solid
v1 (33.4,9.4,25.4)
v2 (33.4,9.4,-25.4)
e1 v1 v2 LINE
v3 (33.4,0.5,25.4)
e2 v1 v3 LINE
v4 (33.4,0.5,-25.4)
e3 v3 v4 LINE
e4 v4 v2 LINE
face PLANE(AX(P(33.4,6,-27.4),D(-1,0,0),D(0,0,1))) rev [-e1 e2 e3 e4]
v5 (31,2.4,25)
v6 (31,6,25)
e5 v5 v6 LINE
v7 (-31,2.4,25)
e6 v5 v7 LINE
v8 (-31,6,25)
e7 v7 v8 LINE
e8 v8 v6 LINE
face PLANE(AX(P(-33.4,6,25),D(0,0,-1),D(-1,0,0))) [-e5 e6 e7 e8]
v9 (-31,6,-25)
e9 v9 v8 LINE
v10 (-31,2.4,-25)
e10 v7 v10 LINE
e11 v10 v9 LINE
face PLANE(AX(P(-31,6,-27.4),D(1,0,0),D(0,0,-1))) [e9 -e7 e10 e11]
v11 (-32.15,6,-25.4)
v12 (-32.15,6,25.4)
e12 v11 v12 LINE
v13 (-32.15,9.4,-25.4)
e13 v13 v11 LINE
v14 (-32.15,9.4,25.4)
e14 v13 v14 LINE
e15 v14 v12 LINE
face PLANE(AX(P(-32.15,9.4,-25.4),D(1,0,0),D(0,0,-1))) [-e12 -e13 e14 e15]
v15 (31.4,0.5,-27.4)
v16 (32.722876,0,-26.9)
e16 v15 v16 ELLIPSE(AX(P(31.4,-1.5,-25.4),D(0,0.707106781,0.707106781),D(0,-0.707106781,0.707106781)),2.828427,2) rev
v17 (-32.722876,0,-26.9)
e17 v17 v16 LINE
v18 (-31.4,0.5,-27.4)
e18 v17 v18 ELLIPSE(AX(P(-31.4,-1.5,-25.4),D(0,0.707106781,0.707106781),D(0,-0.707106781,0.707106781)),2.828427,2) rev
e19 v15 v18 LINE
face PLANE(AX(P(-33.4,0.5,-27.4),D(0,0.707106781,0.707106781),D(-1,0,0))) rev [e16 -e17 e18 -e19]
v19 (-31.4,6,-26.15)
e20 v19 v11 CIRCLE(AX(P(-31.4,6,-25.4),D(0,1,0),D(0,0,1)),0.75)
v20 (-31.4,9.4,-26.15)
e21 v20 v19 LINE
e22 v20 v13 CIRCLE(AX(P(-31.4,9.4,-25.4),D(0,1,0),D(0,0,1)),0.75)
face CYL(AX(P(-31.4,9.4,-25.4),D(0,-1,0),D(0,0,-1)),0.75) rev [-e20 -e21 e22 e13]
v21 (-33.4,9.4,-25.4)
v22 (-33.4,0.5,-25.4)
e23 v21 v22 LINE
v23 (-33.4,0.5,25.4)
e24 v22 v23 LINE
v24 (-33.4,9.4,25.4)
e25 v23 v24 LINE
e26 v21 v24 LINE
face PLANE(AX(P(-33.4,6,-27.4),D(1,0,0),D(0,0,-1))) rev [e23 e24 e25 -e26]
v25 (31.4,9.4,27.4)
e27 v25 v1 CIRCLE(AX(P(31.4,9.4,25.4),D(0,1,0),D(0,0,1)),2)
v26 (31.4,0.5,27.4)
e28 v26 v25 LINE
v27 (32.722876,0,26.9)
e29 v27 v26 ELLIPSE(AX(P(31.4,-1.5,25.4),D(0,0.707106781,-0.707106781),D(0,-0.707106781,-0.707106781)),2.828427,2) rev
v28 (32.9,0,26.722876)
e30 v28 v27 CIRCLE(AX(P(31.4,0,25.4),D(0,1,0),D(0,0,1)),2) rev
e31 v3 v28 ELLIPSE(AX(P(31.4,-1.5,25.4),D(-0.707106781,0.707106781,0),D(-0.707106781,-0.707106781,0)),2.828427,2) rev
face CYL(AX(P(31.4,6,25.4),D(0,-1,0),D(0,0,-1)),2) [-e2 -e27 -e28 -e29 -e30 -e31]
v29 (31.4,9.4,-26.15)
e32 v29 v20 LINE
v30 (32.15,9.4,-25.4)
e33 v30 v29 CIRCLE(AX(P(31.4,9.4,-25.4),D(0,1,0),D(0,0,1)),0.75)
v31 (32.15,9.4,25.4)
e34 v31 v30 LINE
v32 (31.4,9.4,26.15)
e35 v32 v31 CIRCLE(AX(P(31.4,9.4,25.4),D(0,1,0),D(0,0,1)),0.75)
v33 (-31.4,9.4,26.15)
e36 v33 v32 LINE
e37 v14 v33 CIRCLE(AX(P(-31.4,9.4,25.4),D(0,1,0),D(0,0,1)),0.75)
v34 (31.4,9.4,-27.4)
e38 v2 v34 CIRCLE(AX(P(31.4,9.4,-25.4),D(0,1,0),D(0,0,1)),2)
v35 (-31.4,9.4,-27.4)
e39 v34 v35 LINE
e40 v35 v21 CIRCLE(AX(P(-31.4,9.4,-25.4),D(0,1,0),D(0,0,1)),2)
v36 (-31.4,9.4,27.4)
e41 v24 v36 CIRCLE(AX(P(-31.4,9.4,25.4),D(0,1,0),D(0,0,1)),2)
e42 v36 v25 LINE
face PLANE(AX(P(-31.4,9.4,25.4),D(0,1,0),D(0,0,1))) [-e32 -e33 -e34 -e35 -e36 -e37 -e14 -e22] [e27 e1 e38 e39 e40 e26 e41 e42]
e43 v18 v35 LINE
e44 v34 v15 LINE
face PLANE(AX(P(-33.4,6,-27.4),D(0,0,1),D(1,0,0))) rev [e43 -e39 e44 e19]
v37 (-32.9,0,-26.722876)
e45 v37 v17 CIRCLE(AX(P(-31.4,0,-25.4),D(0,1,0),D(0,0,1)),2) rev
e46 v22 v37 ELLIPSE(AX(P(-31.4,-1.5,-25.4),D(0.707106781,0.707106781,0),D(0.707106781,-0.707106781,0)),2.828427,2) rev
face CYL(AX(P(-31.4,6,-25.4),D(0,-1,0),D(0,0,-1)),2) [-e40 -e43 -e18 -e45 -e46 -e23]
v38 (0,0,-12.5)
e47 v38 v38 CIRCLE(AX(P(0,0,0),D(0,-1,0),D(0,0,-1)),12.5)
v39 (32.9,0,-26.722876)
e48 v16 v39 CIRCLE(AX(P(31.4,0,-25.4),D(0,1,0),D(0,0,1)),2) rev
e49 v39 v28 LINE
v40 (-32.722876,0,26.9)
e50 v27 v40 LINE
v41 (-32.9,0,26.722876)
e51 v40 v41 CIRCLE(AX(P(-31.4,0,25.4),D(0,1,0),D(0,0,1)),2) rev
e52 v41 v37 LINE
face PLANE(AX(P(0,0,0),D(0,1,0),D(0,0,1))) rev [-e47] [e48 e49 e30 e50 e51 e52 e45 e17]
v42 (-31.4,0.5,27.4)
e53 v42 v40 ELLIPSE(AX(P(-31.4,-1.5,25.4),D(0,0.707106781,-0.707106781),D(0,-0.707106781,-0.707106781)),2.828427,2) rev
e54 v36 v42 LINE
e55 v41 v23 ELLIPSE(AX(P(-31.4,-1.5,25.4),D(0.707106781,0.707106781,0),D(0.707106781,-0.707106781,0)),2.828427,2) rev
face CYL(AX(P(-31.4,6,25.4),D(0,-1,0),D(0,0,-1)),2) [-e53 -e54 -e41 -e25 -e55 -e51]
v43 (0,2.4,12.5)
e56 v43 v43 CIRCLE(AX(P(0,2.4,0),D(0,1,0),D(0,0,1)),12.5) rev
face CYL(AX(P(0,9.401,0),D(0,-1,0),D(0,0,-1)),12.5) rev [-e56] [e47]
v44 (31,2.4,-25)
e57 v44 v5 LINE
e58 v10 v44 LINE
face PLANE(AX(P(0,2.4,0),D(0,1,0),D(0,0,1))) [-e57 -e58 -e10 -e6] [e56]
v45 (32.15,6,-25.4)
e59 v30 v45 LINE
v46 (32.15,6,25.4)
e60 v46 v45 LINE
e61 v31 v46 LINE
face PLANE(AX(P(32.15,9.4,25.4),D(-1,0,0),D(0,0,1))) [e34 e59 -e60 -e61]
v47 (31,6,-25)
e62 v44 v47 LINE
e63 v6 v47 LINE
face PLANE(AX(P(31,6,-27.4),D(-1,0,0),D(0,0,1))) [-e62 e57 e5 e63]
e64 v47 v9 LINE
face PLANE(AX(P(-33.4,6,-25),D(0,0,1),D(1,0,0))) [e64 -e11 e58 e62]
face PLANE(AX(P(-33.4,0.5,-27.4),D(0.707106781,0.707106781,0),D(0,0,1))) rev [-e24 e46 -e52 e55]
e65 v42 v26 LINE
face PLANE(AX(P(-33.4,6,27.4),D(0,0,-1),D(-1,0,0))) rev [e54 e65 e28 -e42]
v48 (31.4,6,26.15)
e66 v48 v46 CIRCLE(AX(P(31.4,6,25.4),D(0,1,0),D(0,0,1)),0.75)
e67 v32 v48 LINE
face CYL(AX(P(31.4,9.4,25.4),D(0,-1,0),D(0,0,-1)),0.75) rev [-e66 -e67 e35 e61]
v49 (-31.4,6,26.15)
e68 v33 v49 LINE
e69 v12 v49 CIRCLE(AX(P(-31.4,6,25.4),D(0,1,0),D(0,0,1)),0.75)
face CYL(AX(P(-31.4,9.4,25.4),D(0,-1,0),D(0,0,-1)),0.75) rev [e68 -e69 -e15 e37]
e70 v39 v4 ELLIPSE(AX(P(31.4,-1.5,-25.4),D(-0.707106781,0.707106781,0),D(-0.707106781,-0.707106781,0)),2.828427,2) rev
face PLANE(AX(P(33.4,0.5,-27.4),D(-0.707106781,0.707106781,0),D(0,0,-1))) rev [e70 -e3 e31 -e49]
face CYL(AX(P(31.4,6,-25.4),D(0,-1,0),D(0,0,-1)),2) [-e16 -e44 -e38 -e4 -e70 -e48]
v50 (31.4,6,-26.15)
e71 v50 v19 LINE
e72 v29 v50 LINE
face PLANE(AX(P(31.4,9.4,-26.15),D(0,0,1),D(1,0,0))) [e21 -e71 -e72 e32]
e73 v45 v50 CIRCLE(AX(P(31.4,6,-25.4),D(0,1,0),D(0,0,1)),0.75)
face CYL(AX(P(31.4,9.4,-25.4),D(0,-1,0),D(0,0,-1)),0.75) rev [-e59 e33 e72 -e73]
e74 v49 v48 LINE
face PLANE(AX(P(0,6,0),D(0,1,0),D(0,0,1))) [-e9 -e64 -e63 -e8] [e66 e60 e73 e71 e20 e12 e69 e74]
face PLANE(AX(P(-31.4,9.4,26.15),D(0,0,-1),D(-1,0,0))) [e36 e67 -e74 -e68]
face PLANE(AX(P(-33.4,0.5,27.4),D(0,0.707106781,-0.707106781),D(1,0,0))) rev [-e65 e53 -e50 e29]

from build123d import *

# Parameters (mm, degrees)
SKETCH1_W           = 66.8
SKETCH1_H           = 54.8
BOSS_EXTRUDE1_DEPTH = 6
CHAMFER2_SIZE       = 0.5
FILLET2_R           = 2
SHELL3_T            = -2.4
BOSS_EXTRUDE4_DEPTH = 3.4
CUT_EXTRUDE2_REACH  = 46.212
SKETCH6_R           = 12.5


with BuildPart() as part:
    # Sketch1 → Boss-Extrude1 (new body)
    with BuildSketch(Plane(origin=(0, 0, 0), x_dir=(1, 0, 0), z_dir=(0, 1, 0))):
        Rectangle(SKETCH1_W, SKETCH1_H)
    extrude(amount=BOSS_EXTRUDE1_DEPTH)

    # Chamfer2
    chamfer2_edges = [part.edges().sort_by_distance(p)[0] for p in [
        (0, 0, 27.4),
        (-33.4, 0, 0),
        (0, 0, -27.4),
        (33.4, 0, 0),
    ]]
    chamfer(chamfer2_edges, length=CHAMFER2_SIZE)

    # Fillet2
    # the kernel refuses this fillet: 2 mm, written as the material it takes off along each edge
    with BuildSketch(Plane(origin=(33.4, -4.5, 27.4), x_dir=(0, 0, -1), z_dir=(0, 1, 0)), Plane(origin=(33.4, -4.5, -27.4), x_dir=(-1, 0, 0), z_dir=(0, 1, 0))) as fillet2_piece_1:
        with BuildLine():
            CenterArc((FILLET2_R, FILLET2_R), FILLET2_R, 180, 90)
            Line((0, FILLET2_R), (0, 0))
            Line((0, 0), (FILLET2_R, 0))
        make_face()
    extrude(amount=15.5, mode=Mode.SUBTRACT)
    with BuildSketch(Plane(origin=(-33.4, -4.5, 27.4), x_dir=(0, 0, -1), z_dir=(0, 1, 0)), Plane(origin=(-33.4, -4.5, -27.4), x_dir=(1, 0, 0), z_dir=(0, 1, 0))) as fillet2_piece_2:
        with BuildLine():
            CenterArc((FILLET2_R, -FILLET2_R), FILLET2_R, 90, 90)
            Line((0, -FILLET2_R), (0, 0))
            Line((0, 0), (FILLET2_R, 0))
        make_face()
    extrude(amount=15.5, mode=Mode.SUBTRACT)

    # Shell3
    shell3_openings = [part.faces().sort_by_distance(p)[0] for p in [
        (0, 6, 0),
    ]]
    offset(amount=SHELL3_T, openings=shell3_openings, kind=Kind.INTERSECTION)

    # Sketch5 → Boss-Extrude4 (add)
    with BuildSketch(Plane(origin=(0, 6, 0), x_dir=(1, 0, 0), z_dir=(0, 1, 0))):
        with BuildLine():
            Line((33.4, -25.4), (33.4, 25.4))
            ThreePointArc((33.4, 25.4), (32.814213562, 26.814213562), (31.4, 27.4))
            Line((31.4, 27.4), (-31.4, 27.4))
            ThreePointArc((-31.4, 27.4), (-32.814213562, 26.814213562), (-33.4, 25.4))
            Line((-33.4, 25.4), (-33.4, -25.4))
            ThreePointArc((-33.4, -25.4), (-32.814213562, -26.814213562), (-31.4, -27.4))
            Line((-31.4, -27.4), (31.4, -27.4))
            ThreePointArc((31.4, -27.4), (32.814213562, -26.814213562), (33.4, -25.4))
        make_face()
        with BuildLine():
            Line((-31.4, -26.15), (31.4, -26.15))
            ThreePointArc((31.4, -26.15), (31.930330086, -25.930330086), (32.15, -25.4))
            Line((32.15, -25.4), (32.15, 25.4))
            ThreePointArc((32.15, 25.4), (31.930330086, 25.930330086), (31.4, 26.15))
            Line((31.4, 26.15), (-31.4, 26.15))
            ThreePointArc((-31.4, 26.15), (-31.930330086, 25.930330086), (-32.15, 25.4))
            Line((-32.15, 25.4), (-32.15, -25.4))
            ThreePointArc((-32.15, -25.4), (-31.930330086, -25.930330086), (-31.4, -26.15))
        make_face(mode=Mode.SUBTRACT)
    extrude(amount=BOSS_EXTRUDE4_DEPTH)

    # Sketch6 → Cut-Extrude2 (cut, up to next)
    with BuildSketch(Plane.XZ, mode=Mode.PRIVATE) as cut_extrude2_sk1:
        with Locations(Location((0, 0, 0), (0, 0, 270))):
            Circle(SKETCH6_R)
    cut_extrude2_tool1 = extrude(cut_extrude2_sk1.sketch, amount=-CUT_EXTRUDE2_REACH, mode=Mode.PRIVATE) & part.part
    add(cut_extrude2_tool1.solids().sort_by_distance((0, 0, 0))[0], mode=Mode.SUBTRACT)


solid = part.part
